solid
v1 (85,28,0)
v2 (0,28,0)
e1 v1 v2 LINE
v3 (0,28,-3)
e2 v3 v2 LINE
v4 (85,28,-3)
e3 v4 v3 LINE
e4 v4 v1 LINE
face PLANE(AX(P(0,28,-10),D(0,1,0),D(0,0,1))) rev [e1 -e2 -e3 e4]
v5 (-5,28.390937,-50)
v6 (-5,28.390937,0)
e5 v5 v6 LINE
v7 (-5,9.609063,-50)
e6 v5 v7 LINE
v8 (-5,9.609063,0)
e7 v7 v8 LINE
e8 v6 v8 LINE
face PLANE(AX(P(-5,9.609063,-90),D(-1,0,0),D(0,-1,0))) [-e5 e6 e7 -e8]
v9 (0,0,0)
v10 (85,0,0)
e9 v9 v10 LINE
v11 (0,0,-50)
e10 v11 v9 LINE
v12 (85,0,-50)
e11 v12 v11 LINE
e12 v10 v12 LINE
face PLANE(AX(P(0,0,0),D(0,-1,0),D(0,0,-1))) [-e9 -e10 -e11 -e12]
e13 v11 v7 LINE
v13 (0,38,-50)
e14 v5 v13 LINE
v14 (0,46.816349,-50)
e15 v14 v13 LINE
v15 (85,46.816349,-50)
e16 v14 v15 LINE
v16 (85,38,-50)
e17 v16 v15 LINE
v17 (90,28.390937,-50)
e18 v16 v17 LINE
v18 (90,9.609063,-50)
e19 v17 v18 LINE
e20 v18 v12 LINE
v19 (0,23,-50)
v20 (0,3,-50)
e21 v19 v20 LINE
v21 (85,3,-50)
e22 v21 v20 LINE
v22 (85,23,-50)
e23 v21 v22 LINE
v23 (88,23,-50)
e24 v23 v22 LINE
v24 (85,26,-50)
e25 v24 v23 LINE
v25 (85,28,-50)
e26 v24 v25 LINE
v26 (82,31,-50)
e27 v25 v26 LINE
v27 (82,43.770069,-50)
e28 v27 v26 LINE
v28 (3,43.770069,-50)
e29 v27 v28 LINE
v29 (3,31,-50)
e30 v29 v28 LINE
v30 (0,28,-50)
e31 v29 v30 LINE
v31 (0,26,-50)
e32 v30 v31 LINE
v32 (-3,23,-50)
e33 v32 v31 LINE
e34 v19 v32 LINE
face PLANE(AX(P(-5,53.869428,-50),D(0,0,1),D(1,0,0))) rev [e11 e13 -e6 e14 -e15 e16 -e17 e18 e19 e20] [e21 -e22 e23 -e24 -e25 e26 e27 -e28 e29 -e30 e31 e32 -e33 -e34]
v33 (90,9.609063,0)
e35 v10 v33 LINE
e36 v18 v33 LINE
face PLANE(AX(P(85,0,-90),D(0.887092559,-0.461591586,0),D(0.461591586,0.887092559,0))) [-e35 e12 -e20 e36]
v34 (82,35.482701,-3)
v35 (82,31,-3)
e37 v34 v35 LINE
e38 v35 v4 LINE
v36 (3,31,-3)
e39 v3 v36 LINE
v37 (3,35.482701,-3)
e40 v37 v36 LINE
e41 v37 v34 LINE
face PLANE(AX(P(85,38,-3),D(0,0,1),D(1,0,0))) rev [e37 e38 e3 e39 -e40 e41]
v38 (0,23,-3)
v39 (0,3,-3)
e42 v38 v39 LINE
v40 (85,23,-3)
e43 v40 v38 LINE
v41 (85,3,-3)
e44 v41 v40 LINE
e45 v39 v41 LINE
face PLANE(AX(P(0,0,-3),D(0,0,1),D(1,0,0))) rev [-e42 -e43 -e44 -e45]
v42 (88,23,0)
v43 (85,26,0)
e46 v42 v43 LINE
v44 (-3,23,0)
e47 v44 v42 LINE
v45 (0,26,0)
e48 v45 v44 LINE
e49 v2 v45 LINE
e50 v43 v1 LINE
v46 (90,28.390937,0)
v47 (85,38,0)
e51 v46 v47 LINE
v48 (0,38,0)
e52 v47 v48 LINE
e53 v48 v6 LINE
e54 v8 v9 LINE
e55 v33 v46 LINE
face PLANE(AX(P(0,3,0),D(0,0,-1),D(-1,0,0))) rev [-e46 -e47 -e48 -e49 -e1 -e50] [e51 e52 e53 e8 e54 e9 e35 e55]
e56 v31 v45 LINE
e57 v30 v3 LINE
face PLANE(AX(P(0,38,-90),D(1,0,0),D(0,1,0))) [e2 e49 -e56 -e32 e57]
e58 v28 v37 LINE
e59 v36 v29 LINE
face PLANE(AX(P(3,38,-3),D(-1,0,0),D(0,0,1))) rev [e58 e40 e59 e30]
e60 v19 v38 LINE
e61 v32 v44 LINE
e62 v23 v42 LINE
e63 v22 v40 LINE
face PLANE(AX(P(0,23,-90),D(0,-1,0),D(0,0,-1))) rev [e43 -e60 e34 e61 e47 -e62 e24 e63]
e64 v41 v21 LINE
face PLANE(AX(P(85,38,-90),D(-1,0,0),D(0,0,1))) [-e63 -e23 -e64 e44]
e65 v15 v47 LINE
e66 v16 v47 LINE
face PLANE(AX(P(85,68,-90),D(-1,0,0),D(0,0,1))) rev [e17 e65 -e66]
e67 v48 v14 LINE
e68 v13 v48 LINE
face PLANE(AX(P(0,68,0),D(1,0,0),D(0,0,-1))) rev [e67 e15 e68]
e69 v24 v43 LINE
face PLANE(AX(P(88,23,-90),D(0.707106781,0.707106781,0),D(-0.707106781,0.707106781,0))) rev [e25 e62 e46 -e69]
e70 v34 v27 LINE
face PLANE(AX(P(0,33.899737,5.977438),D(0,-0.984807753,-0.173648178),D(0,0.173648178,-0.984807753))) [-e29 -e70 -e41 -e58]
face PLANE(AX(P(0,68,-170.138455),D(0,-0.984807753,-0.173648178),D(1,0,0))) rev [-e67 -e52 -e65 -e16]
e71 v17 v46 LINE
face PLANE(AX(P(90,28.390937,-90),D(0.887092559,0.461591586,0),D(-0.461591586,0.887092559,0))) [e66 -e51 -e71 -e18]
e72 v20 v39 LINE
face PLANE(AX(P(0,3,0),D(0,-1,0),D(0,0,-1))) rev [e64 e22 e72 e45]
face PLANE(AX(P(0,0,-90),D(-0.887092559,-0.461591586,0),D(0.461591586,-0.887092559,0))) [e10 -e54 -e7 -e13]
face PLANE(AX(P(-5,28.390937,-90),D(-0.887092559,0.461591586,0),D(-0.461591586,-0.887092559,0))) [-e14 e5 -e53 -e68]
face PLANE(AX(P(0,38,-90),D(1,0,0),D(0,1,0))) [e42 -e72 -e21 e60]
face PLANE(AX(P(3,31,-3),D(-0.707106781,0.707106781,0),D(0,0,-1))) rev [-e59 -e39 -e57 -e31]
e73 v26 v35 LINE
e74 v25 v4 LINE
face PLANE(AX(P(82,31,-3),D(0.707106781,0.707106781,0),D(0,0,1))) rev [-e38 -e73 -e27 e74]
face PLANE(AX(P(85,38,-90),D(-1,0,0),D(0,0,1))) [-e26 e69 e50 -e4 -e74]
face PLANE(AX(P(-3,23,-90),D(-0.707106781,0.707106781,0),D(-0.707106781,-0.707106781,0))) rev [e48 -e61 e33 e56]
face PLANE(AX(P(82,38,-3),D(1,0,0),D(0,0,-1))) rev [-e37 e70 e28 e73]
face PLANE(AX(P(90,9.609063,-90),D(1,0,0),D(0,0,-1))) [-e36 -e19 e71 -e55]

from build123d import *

# Parameters (mm, degrees)
SKETCH1_W                      = 85
SKETCH1_H                      = 90
BOSS_EXTRUDE1_BASE_DEPTH       = 3
BOSS_EXTRUDE4_SIDE_WALLS_DEPTH = 90
CUT_EXTRUDE2_GUIDE_HOLES_DEPTH = 133.830719339
SKETCH15_W                     = 85
SKETCH15_H                     = 20
BOSS_EXTRUDE9_REAR_WALL_DEPTH  = 3
BOSS_EXTRUDE1_START            = 3
SKETCH17_W                     = 85
SKETCH17_H                     = 3
BOSS_EXTRUDE1_REAR_WALL_DEPTH  = 12
SKETCH30_W                     = 85
SKETCH30_H                     = 2
CUT_EXTRUDE1_REAR_WALL_DEPTH   = 10
BOSS_EXTRUDE2_START            = 25
SKETCH20_W                     = 3
SKETCH20_H                     = 87
BOSS_EXTRUDE2_SIDE_WALL_DEPTH  = 10
CHAMFER1_SIDE_WALL_SIZE        = 3
BOSS_EXTRUDE5_SIDE_WALL_DEPTH  = 30
CHAMFER2_ROOF_SIZE             = 30
CHAMFER2_ROOF_SIZE_2           = 170.138454589
SKETCH28_W                     = 85
SKETCH28_H                     = 91.38839507
BOSS_EXTRUDE7_ROOF_DEPTH       = 3
SKETCH29_W                     = 8.082998623
SKETCH29_H                     = 55.59785115
CUT_EXTRUDE1_CLEAN_UP_DEPTH    = 142.848358117
SKETCH31_W                     = 95
SKETCH31_H                     = 40
CUT_EXTRUDE2_CLEAN_UP_DEPTH    = 139.209678755


# Some blends are built 0.0001 mm under size
with BuildPart() as part:
    # Sketch1 → Boss-Extrude1 (Base) (new body)
    with BuildSketch(Plane(origin=(0, 0, 0), x_dir=(1, 0, 0), z_dir=(0, 1, 0))):
        with Locations((42.5, 45)):
            Rectangle(SKETCH1_W, SKETCH1_H)
    extrude(amount=BOSS_EXTRUDE1_BASE_DEPTH)

    # Sketch5 → Boss-Extrude4 (Side Walls) (add, through all)
    with BuildSketch(Plane.XY):
        Polygon((-5, 28.390936655), (0, 38), (0, 0), (-5, 9.609063345), align=None)
        Polygon((90, 9.609063345), (90, 28.390936655), (85, 38), (85, 0), align=None)
    extrude(amount=-BOSS_EXTRUDE4_SIDE_WALLS_DEPTH)

    # Sketch4 → Cut-Extrude2 (Guide Holes) (cut, through all)
    with BuildSketch(Plane.XY):
        Polygon((-3, 23), (0, 26), (0, 23), align=None)
        Polygon((85, 23), (88, 23), (85, 26), align=None)
    extrude(amount=-CUT_EXTRUDE2_GUIDE_HOLES_DEPTH, mode=Mode.SUBTRACT)

    # Sketch15 → Boss-Extrude9 (Rear Wall) (add)
    with BuildSketch(Plane.XY):
        with Locations((42.5, 13)):
            Rectangle(SKETCH15_W, SKETCH15_H)
    extrude(amount=-BOSS_EXTRUDE9_REAR_WALL_DEPTH)

    # Sketch17 → Boss-Extrude1 (Rear Wall) (add)
    with BuildSketch(Plane(origin=(0, 23, 0), x_dir=(1, 0, 0), z_dir=(0, 1, 0)).offset(BOSS_EXTRUDE1_START)):
        with Locations((42.5, 1.5)):
            Rectangle(SKETCH17_W, SKETCH17_H)
    extrude(amount=BOSS_EXTRUDE1_REAR_WALL_DEPTH)

    # Sketch30 → Cut-Extrude1 (Rear Wall) (cut)
    with BuildSketch(Plane.XY):
        with Locations((42.5, 27)):
            Rectangle(SKETCH30_W, SKETCH30_H)
    extrude(amount=-CUT_EXTRUDE1_REAR_WALL_DEPTH, mode=Mode.SUBTRACT)

    # Sketch20 → Boss-Extrude2 (Side Wall) (add)
    with BuildSketch(Plane(origin=(0, 3, 0), x_dir=(1, 0, 0), z_dir=(0, 1, 0)).offset(BOSS_EXTRUDE2_START)):
        with Locations((1.5, 46.5)):
            Rectangle(SKETCH20_W, SKETCH20_H)
        with Locations((83.5, 46.5)):
            Rectangle(SKETCH20_W, SKETCH20_H)
    extrude(amount=BOSS_EXTRUDE2_SIDE_WALL_DEPTH)

    # Chamfer1 (Side Wall)
    chamfer1_side_wall_edges = [part.edges().sort_by_distance(p)[0] for p in [
        (82, 28, -46.5),
        (3, 28, -46.5),
    ]]
    chamfer(chamfer1_side_wall_edges, length=CHAMFER1_SIDE_WALL_SIZE - 0.0001)  # a hair under: the kernel refuses the full size

    # Sketch26 → Boss-Extrude5 (Side Wall) (add)
    with BuildSketch(Plane(origin=(0, 38, 0), x_dir=(1, 0, 0), z_dir=(0, 1, 0))):
        Polygon((0, 0), (0, 90), (3, 90), (3, 3), (82, 3), (82, 90), (85, 90), (85, 0), align=None)
    extrude(amount=BOSS_EXTRUDE5_SIDE_WALL_DEPTH)

    # Chamfer2 (Roof)
    # the kernel refuses this chamfer: 170.138454589, 30 mm, written as the material it takes off along each edge
    with BuildSketch(Plane(origin=(527.111375011, 68, 0), x_dir=(0, -0.9776715712462578, 0.21013876076743532), z_dir=(-1, 0, 0))) as chamfer2_roof_piece_1:
        Polygon((CHAMFER2_ROOF_SIZE * 0.977671571246, -CHAMFER2_ROOF_SIZE * 0.210138760767), (-CHAMFER2_ROOF_SIZE_2 * 0.210138760767, -CHAMFER2_ROOF_SIZE_2 * 0.977671571244), (0, 0), align=None)
    extrude(amount=969.222750023, mode=Mode.SUBTRACT)

    # Sketch28 → Boss-Extrude7 (Roof) (add)
    with BuildSketch(Plane(origin=(0, 36.854159795, 6.498382723), x_dir=(1, 0, 0), z_dir=(0, 0.9848077530122086, 0.17364817766692742))):
        with Locations((42.5, 52.292828286)):
            Rectangle(SKETCH28_W, SKETCH28_H)
    extrude(amount=-BOSS_EXTRUDE7_ROOF_DEPTH)

    # Sketch29 → Cut-Extrude1 (Clean up) (cut, through all)
    with BuildSketch(Plane(origin=(90, 0, 0), x_dir=(0, 0, -1), z_dir=(1, 0, 0))):
        with Locations((94.041499312, 27.798925575)):
            Rectangle(SKETCH29_W, SKETCH29_H)
    extrude(amount=-CUT_EXTRUDE1_CLEAN_UP_DEPTH, mode=Mode.SUBTRACT)

    # Sketch31 → Cut-Extrude2 (Clean Up) (cut, through all)
    with BuildSketch(Plane.XZ):
        with Locations((42.5, -70)):
            Rectangle(SKETCH31_W, SKETCH31_H)
    extrude(amount=-CUT_EXTRUDE2_CLEAN_UP_DEPTH, mode=Mode.SUBTRACT)


solid = part.part
